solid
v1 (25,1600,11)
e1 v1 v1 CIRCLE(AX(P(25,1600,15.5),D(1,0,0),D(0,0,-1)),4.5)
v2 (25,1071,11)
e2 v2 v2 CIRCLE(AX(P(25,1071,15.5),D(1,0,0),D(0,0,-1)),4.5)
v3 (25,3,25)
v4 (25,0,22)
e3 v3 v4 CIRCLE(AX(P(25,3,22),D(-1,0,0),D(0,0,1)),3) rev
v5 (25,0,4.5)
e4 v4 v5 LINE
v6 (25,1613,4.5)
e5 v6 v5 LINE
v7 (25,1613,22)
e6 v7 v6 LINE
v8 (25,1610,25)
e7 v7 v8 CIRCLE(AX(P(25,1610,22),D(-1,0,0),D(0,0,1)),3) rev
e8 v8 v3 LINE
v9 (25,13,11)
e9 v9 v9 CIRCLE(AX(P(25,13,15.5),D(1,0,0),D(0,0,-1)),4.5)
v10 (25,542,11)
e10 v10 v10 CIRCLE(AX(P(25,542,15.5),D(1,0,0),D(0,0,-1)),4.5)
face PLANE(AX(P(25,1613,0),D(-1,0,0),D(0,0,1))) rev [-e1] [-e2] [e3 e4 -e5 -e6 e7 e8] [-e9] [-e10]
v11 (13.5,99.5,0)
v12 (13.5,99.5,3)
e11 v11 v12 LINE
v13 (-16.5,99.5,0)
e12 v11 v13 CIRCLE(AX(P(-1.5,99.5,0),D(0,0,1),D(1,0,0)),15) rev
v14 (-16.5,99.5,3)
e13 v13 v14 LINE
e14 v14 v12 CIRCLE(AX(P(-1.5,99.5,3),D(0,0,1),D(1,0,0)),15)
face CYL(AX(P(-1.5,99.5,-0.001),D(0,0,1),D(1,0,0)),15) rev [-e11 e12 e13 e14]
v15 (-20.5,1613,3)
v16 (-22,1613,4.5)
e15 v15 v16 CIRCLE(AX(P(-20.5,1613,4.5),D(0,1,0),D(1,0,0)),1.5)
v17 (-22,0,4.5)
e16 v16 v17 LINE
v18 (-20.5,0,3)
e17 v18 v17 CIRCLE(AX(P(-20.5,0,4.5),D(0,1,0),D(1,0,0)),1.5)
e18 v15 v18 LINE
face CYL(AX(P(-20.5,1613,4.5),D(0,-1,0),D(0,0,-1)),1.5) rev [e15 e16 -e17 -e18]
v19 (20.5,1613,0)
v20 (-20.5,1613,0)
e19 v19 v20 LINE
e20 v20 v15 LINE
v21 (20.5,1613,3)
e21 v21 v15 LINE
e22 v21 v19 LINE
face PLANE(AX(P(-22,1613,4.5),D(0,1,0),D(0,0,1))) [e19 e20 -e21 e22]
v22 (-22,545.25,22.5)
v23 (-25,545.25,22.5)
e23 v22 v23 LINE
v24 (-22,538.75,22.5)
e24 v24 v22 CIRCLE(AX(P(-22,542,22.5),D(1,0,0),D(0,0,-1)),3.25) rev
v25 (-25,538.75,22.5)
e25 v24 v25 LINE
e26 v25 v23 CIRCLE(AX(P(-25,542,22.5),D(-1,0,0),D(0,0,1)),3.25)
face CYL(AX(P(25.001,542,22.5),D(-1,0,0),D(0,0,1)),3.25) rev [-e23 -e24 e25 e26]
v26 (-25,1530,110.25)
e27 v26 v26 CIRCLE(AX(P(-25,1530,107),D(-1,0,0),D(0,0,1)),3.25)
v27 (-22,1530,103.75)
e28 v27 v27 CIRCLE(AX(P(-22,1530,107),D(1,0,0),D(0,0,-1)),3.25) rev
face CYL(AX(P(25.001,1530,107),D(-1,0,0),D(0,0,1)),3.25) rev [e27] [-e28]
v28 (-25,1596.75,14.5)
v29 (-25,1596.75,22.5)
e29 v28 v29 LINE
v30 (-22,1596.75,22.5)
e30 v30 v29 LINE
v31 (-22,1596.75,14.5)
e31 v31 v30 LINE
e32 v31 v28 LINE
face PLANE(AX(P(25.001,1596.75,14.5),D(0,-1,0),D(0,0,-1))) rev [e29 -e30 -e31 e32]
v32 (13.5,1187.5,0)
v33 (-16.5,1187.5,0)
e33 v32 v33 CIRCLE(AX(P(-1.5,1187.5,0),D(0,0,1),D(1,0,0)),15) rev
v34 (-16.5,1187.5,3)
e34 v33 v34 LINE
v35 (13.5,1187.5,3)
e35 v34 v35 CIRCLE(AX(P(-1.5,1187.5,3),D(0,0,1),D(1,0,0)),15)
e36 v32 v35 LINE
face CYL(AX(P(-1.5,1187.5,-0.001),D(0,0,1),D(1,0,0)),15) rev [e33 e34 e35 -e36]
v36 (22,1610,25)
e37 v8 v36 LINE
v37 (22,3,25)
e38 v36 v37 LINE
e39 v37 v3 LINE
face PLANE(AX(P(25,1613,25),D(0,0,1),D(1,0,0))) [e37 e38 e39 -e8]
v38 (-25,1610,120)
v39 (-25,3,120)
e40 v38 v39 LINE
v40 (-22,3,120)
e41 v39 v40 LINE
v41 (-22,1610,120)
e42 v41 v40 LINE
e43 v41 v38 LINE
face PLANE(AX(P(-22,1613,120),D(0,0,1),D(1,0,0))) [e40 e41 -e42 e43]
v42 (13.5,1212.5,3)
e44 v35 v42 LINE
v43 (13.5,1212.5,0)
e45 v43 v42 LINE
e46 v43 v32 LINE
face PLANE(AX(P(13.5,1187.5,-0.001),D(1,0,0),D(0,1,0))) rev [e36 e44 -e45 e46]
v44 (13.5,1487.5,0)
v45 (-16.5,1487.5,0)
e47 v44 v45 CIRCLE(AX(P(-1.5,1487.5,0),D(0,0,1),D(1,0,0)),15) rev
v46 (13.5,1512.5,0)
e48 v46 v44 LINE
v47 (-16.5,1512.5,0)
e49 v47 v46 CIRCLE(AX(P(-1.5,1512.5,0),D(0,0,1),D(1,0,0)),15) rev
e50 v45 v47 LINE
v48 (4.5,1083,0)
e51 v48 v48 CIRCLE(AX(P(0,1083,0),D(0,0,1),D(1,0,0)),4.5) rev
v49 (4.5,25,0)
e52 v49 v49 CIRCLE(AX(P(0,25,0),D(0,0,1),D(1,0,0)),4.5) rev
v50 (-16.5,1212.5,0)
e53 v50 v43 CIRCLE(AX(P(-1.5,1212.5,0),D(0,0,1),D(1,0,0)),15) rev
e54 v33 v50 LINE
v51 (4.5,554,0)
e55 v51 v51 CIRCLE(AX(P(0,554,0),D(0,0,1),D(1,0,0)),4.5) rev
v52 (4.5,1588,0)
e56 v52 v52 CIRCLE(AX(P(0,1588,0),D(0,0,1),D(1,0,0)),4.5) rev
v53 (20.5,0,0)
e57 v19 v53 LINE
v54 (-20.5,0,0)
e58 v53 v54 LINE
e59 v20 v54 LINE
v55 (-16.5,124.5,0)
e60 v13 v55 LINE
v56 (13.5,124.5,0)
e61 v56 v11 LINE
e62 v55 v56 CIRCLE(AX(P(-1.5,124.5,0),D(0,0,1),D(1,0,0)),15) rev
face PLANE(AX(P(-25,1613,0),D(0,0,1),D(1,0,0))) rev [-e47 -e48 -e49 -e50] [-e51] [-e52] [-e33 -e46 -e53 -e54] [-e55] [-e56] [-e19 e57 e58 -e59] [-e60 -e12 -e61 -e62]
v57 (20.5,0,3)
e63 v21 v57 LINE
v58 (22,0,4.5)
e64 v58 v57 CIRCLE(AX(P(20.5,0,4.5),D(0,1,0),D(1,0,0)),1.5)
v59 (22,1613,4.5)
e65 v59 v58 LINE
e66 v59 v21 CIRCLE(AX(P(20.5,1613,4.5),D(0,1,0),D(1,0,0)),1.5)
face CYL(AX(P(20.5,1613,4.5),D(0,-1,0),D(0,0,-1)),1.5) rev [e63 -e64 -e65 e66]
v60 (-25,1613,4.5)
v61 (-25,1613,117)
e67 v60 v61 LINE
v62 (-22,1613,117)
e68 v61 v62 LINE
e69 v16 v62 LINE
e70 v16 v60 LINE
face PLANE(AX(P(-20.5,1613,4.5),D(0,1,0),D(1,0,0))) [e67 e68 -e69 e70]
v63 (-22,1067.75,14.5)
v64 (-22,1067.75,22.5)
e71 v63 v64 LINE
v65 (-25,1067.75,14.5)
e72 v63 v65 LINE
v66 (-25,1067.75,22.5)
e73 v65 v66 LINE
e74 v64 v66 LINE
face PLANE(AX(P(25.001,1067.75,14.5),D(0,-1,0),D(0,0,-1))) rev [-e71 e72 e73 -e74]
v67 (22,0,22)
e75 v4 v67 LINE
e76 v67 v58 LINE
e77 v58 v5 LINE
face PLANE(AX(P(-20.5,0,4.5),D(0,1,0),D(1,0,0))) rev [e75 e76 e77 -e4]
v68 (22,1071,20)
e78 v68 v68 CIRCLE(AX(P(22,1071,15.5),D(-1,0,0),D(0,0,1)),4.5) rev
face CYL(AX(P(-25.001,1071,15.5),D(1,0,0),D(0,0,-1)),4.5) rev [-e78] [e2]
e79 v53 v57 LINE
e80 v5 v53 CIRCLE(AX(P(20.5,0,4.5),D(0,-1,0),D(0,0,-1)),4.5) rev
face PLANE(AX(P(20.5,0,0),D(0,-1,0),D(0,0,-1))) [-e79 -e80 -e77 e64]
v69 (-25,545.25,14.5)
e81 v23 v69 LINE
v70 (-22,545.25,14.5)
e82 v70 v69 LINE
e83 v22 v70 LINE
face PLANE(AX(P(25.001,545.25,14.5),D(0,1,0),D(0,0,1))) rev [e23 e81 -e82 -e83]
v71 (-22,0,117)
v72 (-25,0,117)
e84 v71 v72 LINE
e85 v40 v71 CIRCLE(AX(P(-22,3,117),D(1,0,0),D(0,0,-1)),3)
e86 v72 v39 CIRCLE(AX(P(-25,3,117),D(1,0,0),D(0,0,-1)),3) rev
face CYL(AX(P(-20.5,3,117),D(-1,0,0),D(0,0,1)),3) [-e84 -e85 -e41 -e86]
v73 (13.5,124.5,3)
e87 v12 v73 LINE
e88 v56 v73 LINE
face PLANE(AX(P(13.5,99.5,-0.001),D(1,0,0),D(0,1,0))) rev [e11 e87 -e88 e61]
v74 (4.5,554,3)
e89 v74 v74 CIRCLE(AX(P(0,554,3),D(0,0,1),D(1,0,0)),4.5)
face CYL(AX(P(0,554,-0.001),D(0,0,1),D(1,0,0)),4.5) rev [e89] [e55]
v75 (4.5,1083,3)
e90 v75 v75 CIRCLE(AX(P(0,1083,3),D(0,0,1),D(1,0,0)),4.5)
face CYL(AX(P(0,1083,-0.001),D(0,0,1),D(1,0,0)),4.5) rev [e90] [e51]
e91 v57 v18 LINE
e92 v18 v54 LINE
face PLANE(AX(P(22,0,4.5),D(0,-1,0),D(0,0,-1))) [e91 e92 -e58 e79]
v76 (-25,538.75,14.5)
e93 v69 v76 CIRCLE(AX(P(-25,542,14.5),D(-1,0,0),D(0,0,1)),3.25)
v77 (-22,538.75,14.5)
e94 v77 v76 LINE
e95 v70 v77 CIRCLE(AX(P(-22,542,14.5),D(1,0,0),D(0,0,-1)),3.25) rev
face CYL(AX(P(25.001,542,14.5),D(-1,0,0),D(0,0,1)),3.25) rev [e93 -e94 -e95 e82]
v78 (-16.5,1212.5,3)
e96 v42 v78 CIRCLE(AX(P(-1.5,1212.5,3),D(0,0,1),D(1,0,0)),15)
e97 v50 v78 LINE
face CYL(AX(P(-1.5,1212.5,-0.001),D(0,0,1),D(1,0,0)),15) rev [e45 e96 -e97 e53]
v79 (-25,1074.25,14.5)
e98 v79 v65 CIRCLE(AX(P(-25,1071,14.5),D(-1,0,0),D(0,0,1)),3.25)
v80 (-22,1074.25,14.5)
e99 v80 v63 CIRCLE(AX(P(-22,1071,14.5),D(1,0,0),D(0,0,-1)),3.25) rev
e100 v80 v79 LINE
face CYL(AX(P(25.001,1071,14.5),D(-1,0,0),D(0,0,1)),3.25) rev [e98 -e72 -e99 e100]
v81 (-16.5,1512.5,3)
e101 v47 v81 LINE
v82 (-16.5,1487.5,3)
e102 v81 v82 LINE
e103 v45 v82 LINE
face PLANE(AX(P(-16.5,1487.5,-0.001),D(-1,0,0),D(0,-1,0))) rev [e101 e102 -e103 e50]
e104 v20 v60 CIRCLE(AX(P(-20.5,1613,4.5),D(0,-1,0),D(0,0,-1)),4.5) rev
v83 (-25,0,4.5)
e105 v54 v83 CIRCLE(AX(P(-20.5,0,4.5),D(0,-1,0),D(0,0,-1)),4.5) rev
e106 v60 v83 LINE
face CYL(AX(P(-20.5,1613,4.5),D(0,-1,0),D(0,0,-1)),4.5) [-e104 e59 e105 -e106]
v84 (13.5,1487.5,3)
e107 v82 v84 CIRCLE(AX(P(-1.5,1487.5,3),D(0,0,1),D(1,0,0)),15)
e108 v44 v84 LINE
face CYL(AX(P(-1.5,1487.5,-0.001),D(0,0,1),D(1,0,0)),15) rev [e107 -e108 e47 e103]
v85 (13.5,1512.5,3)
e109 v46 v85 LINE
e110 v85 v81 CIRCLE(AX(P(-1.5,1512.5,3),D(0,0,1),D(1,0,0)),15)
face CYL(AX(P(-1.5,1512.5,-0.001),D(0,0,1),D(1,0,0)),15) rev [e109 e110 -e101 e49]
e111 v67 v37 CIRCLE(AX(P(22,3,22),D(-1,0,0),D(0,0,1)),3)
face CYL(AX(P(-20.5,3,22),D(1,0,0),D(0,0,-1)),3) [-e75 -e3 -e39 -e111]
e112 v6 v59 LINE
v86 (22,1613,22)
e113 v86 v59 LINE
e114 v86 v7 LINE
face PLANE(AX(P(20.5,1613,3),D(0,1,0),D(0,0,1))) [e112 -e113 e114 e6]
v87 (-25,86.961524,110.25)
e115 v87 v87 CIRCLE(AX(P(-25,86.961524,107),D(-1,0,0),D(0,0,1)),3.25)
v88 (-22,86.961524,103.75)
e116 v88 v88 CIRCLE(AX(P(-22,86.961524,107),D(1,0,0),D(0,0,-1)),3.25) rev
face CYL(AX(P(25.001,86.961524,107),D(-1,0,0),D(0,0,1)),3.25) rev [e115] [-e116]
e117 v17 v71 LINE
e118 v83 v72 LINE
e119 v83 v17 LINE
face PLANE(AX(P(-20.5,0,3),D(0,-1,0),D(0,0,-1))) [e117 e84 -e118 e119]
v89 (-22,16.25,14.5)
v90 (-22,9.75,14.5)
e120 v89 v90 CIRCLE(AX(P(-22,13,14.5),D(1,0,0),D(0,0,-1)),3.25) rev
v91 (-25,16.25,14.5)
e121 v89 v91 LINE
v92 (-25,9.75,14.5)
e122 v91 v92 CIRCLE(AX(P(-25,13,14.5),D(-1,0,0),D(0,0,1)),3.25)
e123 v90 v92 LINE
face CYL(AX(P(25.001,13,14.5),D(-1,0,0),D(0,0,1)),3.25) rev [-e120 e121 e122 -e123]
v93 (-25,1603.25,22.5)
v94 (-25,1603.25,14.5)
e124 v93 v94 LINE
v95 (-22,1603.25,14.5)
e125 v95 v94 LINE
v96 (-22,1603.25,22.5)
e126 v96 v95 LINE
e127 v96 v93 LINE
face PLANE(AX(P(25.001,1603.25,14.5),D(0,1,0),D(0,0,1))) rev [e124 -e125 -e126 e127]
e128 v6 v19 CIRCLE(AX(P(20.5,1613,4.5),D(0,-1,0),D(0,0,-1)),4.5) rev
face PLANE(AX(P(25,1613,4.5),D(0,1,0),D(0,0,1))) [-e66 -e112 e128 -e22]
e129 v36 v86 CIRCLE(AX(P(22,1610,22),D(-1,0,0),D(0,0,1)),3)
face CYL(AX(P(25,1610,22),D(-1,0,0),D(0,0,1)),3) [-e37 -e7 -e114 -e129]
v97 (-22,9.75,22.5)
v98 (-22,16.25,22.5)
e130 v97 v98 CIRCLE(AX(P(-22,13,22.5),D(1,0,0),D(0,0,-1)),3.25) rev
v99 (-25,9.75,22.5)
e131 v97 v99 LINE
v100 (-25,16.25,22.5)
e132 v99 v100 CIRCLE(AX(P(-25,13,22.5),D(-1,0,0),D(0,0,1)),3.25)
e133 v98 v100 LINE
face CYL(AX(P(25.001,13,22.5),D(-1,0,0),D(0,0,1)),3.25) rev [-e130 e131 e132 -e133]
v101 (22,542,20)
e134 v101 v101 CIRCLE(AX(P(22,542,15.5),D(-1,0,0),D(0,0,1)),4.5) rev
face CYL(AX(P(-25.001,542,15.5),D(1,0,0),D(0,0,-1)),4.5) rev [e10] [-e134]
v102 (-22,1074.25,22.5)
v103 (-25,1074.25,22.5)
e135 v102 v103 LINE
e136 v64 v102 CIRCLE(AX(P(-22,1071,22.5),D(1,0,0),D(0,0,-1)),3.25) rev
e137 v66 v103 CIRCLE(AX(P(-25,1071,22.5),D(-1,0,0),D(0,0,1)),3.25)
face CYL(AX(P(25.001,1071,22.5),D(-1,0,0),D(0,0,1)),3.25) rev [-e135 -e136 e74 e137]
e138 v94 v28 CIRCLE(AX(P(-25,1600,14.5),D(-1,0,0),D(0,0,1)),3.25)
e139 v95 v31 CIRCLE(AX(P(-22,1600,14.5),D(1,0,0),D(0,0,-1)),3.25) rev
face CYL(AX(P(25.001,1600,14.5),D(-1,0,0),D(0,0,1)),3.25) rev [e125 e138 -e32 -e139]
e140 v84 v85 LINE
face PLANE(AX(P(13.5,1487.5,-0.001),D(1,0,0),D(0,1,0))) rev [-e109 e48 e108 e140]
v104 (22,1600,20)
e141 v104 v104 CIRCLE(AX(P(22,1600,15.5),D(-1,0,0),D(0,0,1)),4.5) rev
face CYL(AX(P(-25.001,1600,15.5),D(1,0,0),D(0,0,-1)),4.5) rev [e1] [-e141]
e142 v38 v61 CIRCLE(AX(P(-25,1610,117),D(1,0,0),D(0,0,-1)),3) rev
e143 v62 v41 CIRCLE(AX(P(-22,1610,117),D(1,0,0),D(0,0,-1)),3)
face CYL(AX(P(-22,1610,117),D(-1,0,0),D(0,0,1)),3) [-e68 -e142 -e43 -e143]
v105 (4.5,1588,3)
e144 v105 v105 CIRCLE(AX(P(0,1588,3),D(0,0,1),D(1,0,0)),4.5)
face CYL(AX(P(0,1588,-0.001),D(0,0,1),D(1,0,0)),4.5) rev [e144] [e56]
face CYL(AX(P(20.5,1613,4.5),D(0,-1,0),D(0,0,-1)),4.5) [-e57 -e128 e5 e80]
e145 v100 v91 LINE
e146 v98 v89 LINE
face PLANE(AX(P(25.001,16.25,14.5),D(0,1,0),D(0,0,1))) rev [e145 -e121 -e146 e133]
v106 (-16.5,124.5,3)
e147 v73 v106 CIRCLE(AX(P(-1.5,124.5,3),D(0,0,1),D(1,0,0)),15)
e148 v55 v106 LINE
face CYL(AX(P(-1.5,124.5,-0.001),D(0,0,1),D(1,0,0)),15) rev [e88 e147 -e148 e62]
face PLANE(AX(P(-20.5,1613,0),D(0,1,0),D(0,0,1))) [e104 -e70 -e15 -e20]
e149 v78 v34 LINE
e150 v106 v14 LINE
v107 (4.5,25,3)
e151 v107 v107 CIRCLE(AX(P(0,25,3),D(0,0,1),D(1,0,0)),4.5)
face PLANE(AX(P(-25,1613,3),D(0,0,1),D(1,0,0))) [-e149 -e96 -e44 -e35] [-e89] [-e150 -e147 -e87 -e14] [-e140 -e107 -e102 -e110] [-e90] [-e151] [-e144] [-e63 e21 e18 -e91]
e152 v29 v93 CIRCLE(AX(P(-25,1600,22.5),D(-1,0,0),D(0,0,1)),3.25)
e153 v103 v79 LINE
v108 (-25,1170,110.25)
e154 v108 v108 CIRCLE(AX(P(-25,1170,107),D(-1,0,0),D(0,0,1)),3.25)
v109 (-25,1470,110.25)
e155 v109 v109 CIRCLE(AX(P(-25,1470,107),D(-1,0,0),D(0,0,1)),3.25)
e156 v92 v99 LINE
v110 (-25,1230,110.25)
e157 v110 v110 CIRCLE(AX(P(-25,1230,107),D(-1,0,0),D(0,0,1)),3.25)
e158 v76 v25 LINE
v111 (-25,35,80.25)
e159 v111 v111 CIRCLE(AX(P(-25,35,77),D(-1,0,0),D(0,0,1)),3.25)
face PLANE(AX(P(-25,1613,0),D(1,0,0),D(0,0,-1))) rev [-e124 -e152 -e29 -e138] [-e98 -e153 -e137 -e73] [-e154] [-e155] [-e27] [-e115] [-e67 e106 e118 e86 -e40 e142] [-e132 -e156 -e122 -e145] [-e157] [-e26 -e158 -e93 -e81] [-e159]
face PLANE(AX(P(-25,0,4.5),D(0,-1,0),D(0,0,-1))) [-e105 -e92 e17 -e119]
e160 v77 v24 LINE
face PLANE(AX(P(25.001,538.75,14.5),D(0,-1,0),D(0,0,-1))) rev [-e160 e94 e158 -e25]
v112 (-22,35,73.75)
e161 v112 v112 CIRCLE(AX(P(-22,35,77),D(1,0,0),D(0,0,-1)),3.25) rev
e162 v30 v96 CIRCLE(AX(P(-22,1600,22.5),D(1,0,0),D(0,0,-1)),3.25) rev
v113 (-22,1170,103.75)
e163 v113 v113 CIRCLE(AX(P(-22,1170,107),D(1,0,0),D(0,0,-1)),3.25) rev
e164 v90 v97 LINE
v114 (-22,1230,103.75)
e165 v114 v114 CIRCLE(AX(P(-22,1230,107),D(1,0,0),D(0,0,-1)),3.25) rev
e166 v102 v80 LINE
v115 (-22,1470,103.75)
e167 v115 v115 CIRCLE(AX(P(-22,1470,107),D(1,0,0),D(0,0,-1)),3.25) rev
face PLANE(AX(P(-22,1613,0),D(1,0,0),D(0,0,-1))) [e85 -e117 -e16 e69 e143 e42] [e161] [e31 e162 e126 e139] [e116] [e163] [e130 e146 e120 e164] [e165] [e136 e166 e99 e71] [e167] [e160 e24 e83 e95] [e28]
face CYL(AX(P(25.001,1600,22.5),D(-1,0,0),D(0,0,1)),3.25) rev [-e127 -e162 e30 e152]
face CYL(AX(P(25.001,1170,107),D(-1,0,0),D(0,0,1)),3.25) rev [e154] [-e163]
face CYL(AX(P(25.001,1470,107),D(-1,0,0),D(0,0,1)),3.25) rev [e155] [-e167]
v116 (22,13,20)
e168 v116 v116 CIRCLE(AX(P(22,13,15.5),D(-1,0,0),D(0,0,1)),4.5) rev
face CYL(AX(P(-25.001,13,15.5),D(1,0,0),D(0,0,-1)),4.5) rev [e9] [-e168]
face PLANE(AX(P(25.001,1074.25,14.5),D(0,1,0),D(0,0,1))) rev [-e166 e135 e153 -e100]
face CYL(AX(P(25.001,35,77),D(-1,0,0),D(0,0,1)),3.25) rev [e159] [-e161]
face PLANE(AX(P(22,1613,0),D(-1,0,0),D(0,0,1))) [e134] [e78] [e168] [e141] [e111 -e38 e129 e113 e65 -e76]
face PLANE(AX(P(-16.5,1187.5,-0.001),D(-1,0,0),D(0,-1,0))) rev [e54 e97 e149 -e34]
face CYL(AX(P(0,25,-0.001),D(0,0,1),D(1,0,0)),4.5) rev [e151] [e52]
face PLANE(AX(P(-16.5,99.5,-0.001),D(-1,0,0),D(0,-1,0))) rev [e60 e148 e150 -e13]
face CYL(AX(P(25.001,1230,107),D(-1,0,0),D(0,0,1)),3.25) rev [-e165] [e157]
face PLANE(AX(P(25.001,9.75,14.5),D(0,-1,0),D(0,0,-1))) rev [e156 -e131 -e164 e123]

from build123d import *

# Parameters (mm, degrees)
BASE_FLANGE1_DEPTH = 1613
CUT_EXTRUDE1_REACH = 1620.23
FILLET1_R          = 3
CUT_EXTRUDE2_REACH = 1620.23
SKETCH7_R          = 4.5
LPATTERN1_COUNT    = 4
LPATTERN1_PITCH    = 529
CUT_EXTRUDE3_REACH = 1620.23
SKETCH8_R          = 3.25
CUT_EXTRUDE4_REACH = 1619.431
CUT_EXTRUDE5_REACH = 1619.431
SKETCH10_R         = 4.5
LPATTERN2_COUNT    = 3
LPATTERN2_PITCH    = 529
CUT_EXTRUDE6_REACH = 1619.431
SKETCH12_R         = 4.5


# Sheet-metal steps are written as plain solids
with BuildPart() as part:
    # Sketch1 → Base-Flange1 (new body)
    with BuildSketch(Plane(origin=(0, 0, 0), x_dir=(1, 0, 0), z_dir=(0, 1, 0))):
        with BuildLine():
            Line((-25, -120), (-25, -4.5))
            ThreePointArc((-25, -4.5), (-23.681980515, -1.318019485), (-20.5, 0))
            Line((-20.5, 0), (20.5, 0))
            ThreePointArc((20.5, 0), (23.681980515, -1.318019485), (25, -4.5))
            Line((25, -4.5), (25, -25))
            Line((25, -25), (22, -25))
            Line((22, -25), (22, -4.5))
            ThreePointArc((22, -4.5), (21.560660172, -3.439339828), (20.5, -3))
            Line((20.5, -3), (-20.5, -3))
            ThreePointArc((-20.5, -3), (-21.560660172, -3.439339828), (-22, -4.5))
            Line((-22, -4.5), (-22, -120))
            Line((-22, -120), (-25, -120))
        make_face()
    extrude(amount=BASE_FLANGE1_DEPTH)

    # Sketch6 → Cut-Extrude1 (cut, up to next)
    with BuildSketch(Plane.ZY.offset(25), mode=Mode.PRIVATE) as cut_extrude1_sk1:
        with BuildLine():
            Line((14.5, 16.25), (22.5, 16.25))
            ThreePointArc((22.5, 16.25), (25.75, 13), (22.5, 9.75))
            Line((22.5, 9.75), (14.5, 9.75))
            ThreePointArc((14.5, 9.75), (11.25, 13), (14.5, 16.25))
        make_face()
    cut_extrude1_tool1 = extrude(cut_extrude1_sk1.sketch, amount=-CUT_EXTRUDE1_REACH, mode=Mode.PRIVATE) & part.part
    cut_extrude1 = cut_extrude1_tool1.solids().sort_by_distance((-25, 13, 18.5))[0]
    add(cut_extrude1, mode=Mode.SUBTRACT)

    # Fillet1
    fillet1_edges = [part.edges().sort_by_distance(p)[0] for p in [
        (23.5, 0, 25),
        (-23.5, 0, 120),
        (23.5, 1613, 25),
        (-23.5, 1613, 120),
    ]]
    fillet(fillet1_edges, radius=FILLET1_R)

    # Sketch7 → Cut-Extrude2 (cut, up to next)
    with BuildSketch(Plane(origin=(25, 0, 0), x_dir=(0, 0, -1), z_dir=(1, 0, 0)), mode=Mode.PRIVATE) as cut_extrude2_sk1:
        with Locations((-15.5, 13)):
            Circle(SKETCH7_R)
    cut_extrude2_tool1 = extrude(cut_extrude2_sk1.sketch, amount=-CUT_EXTRUDE2_REACH, mode=Mode.PRIVATE) & part.part
    cut_extrude2 = cut_extrude2_tool1.solids().sort_by_distance((25, 13, 15.5))[0]
    add(cut_extrude2, mode=Mode.SUBTRACT)

    # LPattern1: Cut-Extrude1, Cut-Extrude2 ×4
    with Locations(*[(0, i * LPATTERN1_PITCH, 0) for i in range(1, LPATTERN1_COUNT)]):
        add(cut_extrude1, mode=Mode.SUBTRACT)
        add(cut_extrude2, mode=Mode.SUBTRACT)

    # Sketch8 → Cut-Extrude3 (cut, up to next)
    with BuildSketch(Plane.ZY.offset(25), mode=Mode.PRIVATE) as cut_extrude3_sk1:
        with Locations((107, 86.961524227)):
            Circle(SKETCH8_R)
    cut_extrude3_tool1 = extrude(cut_extrude3_sk1.sketch, amount=-CUT_EXTRUDE3_REACH, mode=Mode.PRIVATE) & part.part
    # Sketch8 → Cut-Extrude3 (cut, up to next)
    with BuildSketch(Plane.ZY.offset(25), mode=Mode.PRIVATE) as cut_extrude3_sk2:
        with Locations((77, 35)):
            Circle(SKETCH8_R)
    cut_extrude3_tool2 = extrude(cut_extrude3_sk2.sketch, amount=-CUT_EXTRUDE3_REACH, mode=Mode.PRIVATE) & part.part
    # Sketch8 → Cut-Extrude3 (cut, up to next)
    with BuildSketch(Plane.ZY.offset(25), mode=Mode.PRIVATE) as cut_extrude3_sk3:
        with Locations((107, 1230)):
            Circle(SKETCH8_R)
    cut_extrude3_tool3 = extrude(cut_extrude3_sk3.sketch, amount=-CUT_EXTRUDE3_REACH, mode=Mode.PRIVATE) & part.part
    # Sketch8 → Cut-Extrude3 (cut, up to next)
    with BuildSketch(Plane.ZY.offset(25), mode=Mode.PRIVATE) as cut_extrude3_sk4:
        with Locations((107, 1170)):
            Circle(SKETCH8_R)
    cut_extrude3_tool4 = extrude(cut_extrude3_sk4.sketch, amount=-CUT_EXTRUDE3_REACH, mode=Mode.PRIVATE) & part.part
    # Sketch8 → Cut-Extrude3 (cut, up to next)
    with BuildSketch(Plane.ZY.offset(25), mode=Mode.PRIVATE) as cut_extrude3_sk5:
        with Locations((107, 1530)):
            Circle(SKETCH8_R)
    cut_extrude3_tool5 = extrude(cut_extrude3_sk5.sketch, amount=-CUT_EXTRUDE3_REACH, mode=Mode.PRIVATE) & part.part
    # Sketch8 → Cut-Extrude3 (cut, up to next)
    with BuildSketch(Plane.ZY.offset(25), mode=Mode.PRIVATE) as cut_extrude3_sk6:
        with Locations((107, 1470)):
            Circle(SKETCH8_R)
    cut_extrude3_tool6 = extrude(cut_extrude3_sk6.sketch, amount=-CUT_EXTRUDE3_REACH, mode=Mode.PRIVATE) & part.part
    add(cut_extrude3_tool1.solids().sort_by_distance((-25, 86.961524, 107))[0], mode=Mode.SUBTRACT)
    add(cut_extrude3_tool2.solids().sort_by_distance((-25, 35, 77))[0], mode=Mode.SUBTRACT)
    add(cut_extrude3_tool3.solids().sort_by_distance((-25, 1230, 107))[0], mode=Mode.SUBTRACT)
    add(cut_extrude3_tool4.solids().sort_by_distance((-25, 1170, 107))[0], mode=Mode.SUBTRACT)
    add(cut_extrude3_tool5.solids().sort_by_distance((-25, 1530, 107))[0], mode=Mode.SUBTRACT)
    add(cut_extrude3_tool6.solids().sort_by_distance((-25, 1470, 107))[0], mode=Mode.SUBTRACT)

    # Sketch9 → Cut-Extrude4 (cut, up to next)
    with BuildSketch(Plane.XY.offset(3), mode=Mode.PRIVATE) as cut_extrude4_sk1:
        with BuildLine():
            Line((-16.5, 99.5), (-16.5, 124.5))
            ThreePointArc((-16.5, 124.5), (-1.5, 139.5), (13.5, 124.5))
            Line((13.5, 124.5), (13.5, 99.5))
            ThreePointArc((13.5, 99.5), (-1.5, 84.5), (-16.5, 99.5))
        make_face()
    cut_extrude4_tool1 = extrude(cut_extrude4_sk1.sketch, amount=-CUT_EXTRUDE4_REACH, mode=Mode.PRIVATE) & part.part
    # Sketch9 → Cut-Extrude4 (cut, up to next)
    with BuildSketch(Plane.XY.offset(3), mode=Mode.PRIVATE) as cut_extrude4_sk2:
        with BuildLine():
            Line((-16.5, 1187.5), (-16.5, 1212.5))
            ThreePointArc((-16.5, 1212.5), (-1.5, 1227.5), (13.5, 1212.5))
            Line((13.5, 1212.5), (13.5, 1187.5))
            ThreePointArc((13.5, 1187.5), (-1.5, 1172.5), (-16.5, 1187.5))
        make_face()
    cut_extrude4_tool2 = extrude(cut_extrude4_sk2.sketch, amount=-CUT_EXTRUDE4_REACH, mode=Mode.PRIVATE) & part.part
    # Sketch9 → Cut-Extrude4 (cut, up to next)
    with BuildSketch(Plane.XY.offset(3), mode=Mode.PRIVATE) as cut_extrude4_sk3:
        with BuildLine():
            Line((-16.5, 1487.5), (-16.5, 1512.5))
            ThreePointArc((-16.5, 1512.5), (-1.5, 1527.5), (13.5, 1512.5))
            Line((13.5, 1512.5), (13.5, 1487.5))
            ThreePointArc((13.5, 1487.5), (-1.5, 1472.5), (-16.5, 1487.5))
        make_face()
    cut_extrude4_tool3 = extrude(cut_extrude4_sk3.sketch, amount=-CUT_EXTRUDE4_REACH, mode=Mode.PRIVATE) & part.part
    add(cut_extrude4_tool1.solids().sort_by_distance((-1.5, 112, 3))[0], mode=Mode.SUBTRACT)
    add(cut_extrude4_tool2.solids().sort_by_distance((-1.5, 1200, 3))[0], mode=Mode.SUBTRACT)
    add(cut_extrude4_tool3.solids().sort_by_distance((-1.5, 1500, 3))[0], mode=Mode.SUBTRACT)

    # Sketch10 → Cut-Extrude5 (cut, up to next)
    with BuildSketch(Plane.XY.offset(3), mode=Mode.PRIVATE) as cut_extrude5_sk1:
        with Locations((0, 25)):
            Circle(SKETCH10_R)
    cut_extrude5_tool1 = extrude(cut_extrude5_sk1.sketch, amount=-CUT_EXTRUDE5_REACH, mode=Mode.PRIVATE) & part.part
    cut_extrude5 = cut_extrude5_tool1.solids().sort_by_distance((0, 25, 3))[0]
    add(cut_extrude5, mode=Mode.SUBTRACT)

    # LPattern2: Cut-Extrude5 ×3
    with Locations(*[(0, i * LPATTERN2_PITCH, 0) for i in range(1, LPATTERN2_COUNT)]):
        add(cut_extrude5, mode=Mode.SUBTRACT)

    # Sketch12 → Cut-Extrude6 (cut, up to next)
    with BuildSketch(Plane.XY.offset(3), mode=Mode.PRIVATE) as cut_extrude6_sk1:
        with Locations((0, 1588)):
            Circle(SKETCH12_R)
    cut_extrude6_tool1 = extrude(cut_extrude6_sk1.sketch, amount=-CUT_EXTRUDE6_REACH, mode=Mode.PRIVATE) & part.part
    add(cut_extrude6_tool1.solids().sort_by_distance((0, 1588, 3))[0], mode=Mode.SUBTRACT)


solid = part.part
